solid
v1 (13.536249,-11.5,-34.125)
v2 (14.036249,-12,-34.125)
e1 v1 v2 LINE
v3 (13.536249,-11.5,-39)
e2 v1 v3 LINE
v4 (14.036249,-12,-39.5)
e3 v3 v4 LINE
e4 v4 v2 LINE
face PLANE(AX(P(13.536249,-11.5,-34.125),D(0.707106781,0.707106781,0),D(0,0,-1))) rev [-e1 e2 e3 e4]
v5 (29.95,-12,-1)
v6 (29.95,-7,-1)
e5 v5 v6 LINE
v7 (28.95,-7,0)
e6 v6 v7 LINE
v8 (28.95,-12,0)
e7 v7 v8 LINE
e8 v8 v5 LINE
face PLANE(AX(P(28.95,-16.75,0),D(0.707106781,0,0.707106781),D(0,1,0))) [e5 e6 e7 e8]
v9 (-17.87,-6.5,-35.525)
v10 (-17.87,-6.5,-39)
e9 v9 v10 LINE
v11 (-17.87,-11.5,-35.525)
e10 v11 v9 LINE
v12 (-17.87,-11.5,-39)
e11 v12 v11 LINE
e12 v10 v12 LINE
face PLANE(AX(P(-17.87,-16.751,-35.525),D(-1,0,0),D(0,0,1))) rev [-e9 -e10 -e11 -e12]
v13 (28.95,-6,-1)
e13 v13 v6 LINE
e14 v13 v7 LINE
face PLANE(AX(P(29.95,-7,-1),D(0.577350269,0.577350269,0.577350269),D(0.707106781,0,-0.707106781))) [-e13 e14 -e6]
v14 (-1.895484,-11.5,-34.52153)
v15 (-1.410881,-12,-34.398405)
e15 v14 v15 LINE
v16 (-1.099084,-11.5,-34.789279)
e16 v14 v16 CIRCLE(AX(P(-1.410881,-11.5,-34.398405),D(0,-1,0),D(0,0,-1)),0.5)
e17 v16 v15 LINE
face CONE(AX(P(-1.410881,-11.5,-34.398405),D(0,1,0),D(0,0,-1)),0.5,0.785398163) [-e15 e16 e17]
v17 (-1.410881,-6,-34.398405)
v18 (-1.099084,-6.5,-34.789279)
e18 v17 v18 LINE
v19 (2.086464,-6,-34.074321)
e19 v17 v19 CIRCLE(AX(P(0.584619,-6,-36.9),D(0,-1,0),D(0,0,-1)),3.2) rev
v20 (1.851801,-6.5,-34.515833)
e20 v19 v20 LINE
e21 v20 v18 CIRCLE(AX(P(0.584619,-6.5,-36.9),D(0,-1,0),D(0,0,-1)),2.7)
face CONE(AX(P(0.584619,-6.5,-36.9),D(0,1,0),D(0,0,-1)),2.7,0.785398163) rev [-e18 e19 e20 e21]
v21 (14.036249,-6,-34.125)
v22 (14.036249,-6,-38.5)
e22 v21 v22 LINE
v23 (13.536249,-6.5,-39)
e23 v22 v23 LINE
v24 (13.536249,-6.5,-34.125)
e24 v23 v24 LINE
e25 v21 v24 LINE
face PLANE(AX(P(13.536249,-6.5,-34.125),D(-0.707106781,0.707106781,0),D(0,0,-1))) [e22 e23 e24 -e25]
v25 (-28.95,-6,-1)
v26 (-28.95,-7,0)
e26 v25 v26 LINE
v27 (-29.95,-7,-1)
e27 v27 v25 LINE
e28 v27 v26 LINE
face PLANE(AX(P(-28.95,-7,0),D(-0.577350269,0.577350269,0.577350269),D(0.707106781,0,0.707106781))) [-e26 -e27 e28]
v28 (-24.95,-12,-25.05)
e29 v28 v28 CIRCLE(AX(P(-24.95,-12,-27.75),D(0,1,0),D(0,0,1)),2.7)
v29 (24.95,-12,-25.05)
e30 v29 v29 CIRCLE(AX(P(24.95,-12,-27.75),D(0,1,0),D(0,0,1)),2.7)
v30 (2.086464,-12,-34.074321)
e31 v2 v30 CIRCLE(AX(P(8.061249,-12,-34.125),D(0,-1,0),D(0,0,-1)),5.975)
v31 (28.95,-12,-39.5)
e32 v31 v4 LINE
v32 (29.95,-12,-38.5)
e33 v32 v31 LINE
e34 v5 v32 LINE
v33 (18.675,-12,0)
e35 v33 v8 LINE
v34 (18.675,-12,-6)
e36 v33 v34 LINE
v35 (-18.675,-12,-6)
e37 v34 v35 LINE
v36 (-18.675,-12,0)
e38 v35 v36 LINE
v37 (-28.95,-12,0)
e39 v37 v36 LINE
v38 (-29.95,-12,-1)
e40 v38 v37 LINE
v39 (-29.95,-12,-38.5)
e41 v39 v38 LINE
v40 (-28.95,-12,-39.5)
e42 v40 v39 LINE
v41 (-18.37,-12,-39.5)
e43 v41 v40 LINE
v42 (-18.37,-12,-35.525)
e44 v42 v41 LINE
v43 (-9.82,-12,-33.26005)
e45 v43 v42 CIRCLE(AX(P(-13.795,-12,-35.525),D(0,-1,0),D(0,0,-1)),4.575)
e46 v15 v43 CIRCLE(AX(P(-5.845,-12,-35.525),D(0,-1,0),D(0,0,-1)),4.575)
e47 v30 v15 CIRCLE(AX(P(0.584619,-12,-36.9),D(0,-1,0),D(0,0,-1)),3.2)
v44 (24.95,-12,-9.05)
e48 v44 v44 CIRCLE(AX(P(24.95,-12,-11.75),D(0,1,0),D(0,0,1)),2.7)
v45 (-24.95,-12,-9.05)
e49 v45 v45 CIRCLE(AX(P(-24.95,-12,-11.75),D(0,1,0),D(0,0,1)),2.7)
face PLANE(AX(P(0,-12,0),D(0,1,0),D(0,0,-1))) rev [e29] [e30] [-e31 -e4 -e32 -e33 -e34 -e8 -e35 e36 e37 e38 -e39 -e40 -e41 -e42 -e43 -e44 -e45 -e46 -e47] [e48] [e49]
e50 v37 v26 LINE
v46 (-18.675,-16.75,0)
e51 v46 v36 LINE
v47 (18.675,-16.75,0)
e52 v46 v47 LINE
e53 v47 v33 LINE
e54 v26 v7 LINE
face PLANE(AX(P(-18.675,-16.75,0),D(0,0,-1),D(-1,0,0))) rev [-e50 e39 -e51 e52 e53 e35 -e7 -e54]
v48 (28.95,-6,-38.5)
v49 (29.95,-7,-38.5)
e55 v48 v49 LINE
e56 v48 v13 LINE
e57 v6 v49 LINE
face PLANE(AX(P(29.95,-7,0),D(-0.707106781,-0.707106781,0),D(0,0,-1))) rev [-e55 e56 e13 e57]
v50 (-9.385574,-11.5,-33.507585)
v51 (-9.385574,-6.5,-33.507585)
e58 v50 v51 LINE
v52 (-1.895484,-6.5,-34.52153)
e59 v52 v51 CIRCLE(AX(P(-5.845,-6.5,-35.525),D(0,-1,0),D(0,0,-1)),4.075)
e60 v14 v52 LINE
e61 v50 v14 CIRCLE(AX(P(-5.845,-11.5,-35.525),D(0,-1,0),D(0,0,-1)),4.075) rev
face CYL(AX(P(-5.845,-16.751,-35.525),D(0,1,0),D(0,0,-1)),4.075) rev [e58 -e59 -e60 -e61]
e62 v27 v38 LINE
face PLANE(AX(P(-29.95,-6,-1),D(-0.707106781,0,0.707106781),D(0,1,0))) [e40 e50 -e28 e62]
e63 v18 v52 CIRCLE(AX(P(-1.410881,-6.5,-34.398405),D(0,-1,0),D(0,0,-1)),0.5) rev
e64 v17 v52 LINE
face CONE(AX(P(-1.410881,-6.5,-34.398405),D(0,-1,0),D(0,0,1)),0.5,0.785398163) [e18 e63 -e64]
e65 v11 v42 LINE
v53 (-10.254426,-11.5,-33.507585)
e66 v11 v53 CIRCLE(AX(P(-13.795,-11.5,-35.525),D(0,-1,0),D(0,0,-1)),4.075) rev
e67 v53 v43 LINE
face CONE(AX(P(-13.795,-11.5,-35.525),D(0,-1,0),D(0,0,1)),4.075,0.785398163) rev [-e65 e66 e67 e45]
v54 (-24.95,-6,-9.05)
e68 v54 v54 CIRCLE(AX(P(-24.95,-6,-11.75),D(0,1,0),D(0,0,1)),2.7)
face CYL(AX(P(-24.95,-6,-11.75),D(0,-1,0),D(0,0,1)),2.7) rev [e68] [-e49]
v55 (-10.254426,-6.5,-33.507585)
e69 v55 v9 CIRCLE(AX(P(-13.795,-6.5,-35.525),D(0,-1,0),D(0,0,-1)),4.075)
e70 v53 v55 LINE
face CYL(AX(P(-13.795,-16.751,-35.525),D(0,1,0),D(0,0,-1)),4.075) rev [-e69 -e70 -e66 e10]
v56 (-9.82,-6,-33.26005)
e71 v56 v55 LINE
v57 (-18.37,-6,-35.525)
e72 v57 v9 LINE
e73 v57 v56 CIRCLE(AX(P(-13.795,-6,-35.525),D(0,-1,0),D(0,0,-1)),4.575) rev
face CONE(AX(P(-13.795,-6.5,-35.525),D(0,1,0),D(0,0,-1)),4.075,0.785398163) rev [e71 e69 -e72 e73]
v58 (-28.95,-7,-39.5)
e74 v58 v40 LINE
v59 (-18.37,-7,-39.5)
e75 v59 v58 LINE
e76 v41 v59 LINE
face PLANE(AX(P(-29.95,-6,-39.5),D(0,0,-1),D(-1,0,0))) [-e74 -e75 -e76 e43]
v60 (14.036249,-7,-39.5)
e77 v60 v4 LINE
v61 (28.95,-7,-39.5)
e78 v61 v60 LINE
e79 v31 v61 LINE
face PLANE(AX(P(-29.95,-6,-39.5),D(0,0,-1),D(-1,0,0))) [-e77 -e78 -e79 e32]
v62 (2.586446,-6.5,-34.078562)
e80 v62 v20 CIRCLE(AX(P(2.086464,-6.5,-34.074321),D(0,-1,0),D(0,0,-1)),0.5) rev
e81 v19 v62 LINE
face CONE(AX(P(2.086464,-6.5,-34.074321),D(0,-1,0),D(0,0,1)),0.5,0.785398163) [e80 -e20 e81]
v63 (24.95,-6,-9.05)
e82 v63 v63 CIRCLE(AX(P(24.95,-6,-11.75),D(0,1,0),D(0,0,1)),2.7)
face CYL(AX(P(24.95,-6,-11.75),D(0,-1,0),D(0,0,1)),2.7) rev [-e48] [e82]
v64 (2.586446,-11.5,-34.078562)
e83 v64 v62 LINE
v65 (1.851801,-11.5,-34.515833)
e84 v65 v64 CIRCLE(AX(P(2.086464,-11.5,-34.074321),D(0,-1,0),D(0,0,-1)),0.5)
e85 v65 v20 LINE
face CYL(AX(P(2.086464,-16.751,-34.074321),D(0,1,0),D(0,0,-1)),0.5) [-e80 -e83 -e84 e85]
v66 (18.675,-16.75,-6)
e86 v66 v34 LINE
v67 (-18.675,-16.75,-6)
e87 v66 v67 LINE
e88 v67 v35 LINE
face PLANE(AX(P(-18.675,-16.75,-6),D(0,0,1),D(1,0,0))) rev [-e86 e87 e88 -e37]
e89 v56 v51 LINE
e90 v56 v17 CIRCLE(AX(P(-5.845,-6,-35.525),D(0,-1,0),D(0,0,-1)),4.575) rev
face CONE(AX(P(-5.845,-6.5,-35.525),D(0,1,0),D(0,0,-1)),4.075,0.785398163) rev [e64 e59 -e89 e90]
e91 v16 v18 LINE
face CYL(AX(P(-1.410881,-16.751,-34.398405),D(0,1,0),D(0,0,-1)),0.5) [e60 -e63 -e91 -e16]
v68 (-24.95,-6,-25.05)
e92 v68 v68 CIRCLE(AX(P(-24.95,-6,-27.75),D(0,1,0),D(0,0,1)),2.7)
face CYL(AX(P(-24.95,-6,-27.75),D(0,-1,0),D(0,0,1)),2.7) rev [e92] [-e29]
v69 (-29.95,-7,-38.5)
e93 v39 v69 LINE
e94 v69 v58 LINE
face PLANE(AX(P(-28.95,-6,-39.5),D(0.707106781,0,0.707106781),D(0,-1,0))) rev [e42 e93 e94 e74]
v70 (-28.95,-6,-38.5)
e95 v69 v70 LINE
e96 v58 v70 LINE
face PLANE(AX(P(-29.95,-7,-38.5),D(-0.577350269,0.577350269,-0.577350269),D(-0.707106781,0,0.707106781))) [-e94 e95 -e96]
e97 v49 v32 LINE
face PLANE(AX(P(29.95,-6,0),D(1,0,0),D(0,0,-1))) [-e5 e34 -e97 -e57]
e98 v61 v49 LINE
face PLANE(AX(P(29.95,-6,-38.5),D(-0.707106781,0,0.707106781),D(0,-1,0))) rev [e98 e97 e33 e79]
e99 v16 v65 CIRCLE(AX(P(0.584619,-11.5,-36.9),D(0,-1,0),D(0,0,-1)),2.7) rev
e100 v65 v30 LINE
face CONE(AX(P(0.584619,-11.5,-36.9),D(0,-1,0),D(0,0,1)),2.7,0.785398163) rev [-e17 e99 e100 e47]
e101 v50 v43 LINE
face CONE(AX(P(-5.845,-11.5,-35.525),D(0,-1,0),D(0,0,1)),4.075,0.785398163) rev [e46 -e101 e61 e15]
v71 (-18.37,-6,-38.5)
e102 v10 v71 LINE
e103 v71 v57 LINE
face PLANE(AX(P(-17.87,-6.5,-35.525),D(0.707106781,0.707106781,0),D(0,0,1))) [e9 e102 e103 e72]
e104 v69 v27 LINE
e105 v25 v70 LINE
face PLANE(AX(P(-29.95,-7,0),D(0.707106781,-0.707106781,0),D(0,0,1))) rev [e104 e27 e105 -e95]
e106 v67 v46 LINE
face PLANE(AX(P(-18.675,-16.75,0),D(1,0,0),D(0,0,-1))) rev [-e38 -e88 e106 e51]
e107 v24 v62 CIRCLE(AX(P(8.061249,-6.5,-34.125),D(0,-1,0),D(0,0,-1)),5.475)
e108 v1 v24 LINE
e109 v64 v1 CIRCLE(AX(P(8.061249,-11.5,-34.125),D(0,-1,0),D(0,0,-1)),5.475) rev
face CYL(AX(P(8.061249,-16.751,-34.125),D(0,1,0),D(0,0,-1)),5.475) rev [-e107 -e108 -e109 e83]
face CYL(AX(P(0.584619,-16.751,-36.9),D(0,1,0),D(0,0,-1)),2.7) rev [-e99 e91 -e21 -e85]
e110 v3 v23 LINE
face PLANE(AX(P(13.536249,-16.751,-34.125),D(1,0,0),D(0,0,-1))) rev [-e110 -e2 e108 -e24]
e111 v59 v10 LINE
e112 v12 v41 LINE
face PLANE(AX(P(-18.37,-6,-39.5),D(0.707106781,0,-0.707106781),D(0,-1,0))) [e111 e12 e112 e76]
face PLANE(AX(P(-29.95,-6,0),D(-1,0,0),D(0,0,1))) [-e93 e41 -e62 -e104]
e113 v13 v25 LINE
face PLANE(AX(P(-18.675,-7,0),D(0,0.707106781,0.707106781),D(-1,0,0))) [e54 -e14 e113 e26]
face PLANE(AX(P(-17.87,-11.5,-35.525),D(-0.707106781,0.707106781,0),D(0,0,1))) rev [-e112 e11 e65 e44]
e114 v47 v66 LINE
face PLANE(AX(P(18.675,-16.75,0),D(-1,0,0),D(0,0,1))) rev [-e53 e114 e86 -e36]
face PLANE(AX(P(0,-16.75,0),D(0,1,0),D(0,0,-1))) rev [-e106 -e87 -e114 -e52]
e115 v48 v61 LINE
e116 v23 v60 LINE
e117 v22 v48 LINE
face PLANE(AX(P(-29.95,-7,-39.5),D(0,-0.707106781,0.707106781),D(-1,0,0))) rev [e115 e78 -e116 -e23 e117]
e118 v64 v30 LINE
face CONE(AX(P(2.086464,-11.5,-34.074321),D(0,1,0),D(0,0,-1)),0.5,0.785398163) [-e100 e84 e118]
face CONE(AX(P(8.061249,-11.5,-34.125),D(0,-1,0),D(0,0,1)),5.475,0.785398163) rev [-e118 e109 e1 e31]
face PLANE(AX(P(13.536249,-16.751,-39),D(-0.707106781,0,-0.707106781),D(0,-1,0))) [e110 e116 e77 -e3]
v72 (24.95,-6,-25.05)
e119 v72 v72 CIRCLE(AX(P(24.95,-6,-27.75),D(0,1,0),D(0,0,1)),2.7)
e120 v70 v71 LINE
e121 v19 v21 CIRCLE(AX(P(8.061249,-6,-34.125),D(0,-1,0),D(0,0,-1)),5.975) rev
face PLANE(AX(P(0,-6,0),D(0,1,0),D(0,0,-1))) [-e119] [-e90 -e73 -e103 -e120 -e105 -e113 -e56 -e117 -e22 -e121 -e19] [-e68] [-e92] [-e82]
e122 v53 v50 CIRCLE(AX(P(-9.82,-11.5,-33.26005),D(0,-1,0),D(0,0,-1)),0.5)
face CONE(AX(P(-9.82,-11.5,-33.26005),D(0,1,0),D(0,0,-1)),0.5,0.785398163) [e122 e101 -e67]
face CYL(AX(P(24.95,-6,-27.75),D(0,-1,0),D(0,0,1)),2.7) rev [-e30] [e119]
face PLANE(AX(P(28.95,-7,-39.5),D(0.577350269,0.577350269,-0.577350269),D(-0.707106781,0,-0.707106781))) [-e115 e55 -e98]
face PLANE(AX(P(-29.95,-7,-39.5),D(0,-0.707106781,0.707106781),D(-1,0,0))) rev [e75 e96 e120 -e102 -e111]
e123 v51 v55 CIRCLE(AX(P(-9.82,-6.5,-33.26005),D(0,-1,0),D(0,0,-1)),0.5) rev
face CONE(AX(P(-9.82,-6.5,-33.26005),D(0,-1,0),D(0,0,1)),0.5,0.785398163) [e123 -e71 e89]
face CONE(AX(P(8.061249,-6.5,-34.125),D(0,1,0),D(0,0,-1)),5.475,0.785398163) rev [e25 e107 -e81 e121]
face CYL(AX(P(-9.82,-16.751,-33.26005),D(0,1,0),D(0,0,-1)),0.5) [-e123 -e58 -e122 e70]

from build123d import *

# Parameters (mm, degrees)
SKETCH3_W           = 37.35
SKETCH3_H           = 6
BOSS_EXTRUDE1_DEPTH = 4.75
SKETCH4_W           = 59.9
SKETCH4_H           = 39.5
SKETCH4_R           = 2.7
BOSS_EXTRUDE2_DEPTH = 6
CUT_EXTRUDE1_REACH  = 52.723
CHAMFER1_SIZE       = 1
CHAMFER2_SIZE       = 0.5


with BuildPart() as part:
    # Sketch3 → Boss-Extrude1 (new body)
    with BuildSketch(Plane(origin=(0, 0, 0), x_dir=(1, 0, 0), z_dir=(0, 1, 0))):
        with Locations((0, 3)):
            Rectangle(SKETCH3_W, SKETCH3_H)
    extrude(amount=BOSS_EXTRUDE1_DEPTH)

    # Sketch4 → Boss-Extrude2 (add)
    with BuildSketch(Plane(origin=(0, 0, 0), x_dir=(1, 0, 0), z_dir=(0, 1, 0))):
        with Locations((0, 19.75)):
            Rectangle(SKETCH4_W, SKETCH4_H)
        with Locations(Location((-24.95, 11.75, 0), (0, 0, 270))):
            Circle(SKETCH4_R, mode=Mode.SUBTRACT)
        with Locations(Location((-24.95, 27.75, 0), (0, 0, 270))):
            Circle(SKETCH4_R, mode=Mode.SUBTRACT)
        with Locations(Location((24.95, 11.75, 0), (0, 0, 270))):
            Circle(SKETCH4_R, mode=Mode.SUBTRACT)
        with Locations(Location((24.95, 27.75, 0), (0, 0, 270))):
            Circle(SKETCH4_R, mode=Mode.SUBTRACT)
    extrude(amount=-BOSS_EXTRUDE2_DEPTH)

    # Sketch5 → Cut-Extrude1 (cut, up to next)
    with BuildSketch(Plane.XZ.offset(6), mode=Mode.PRIVATE) as cut_extrude1_sk1:
        with BuildLine():
            Line((-17.87, -35.525), (-17.87, -39.5))
            Line((-17.87, -39.5), (13.536249219, -39.5))
            Line((13.536249219, -39.5), (13.536249219, -34.125))
            ThreePointArc((13.536249219, -34.125), (8.084468405, -28.650049236), (2.586446162, -34.078562046))
            ThreePointArc((2.586446162, -34.078562046), (2.342198533, -34.503972069), (1.851800837, -34.515833459))
            ThreePointArc((1.851800837, -34.515833459), (0.335489147, -34.21151821), (-1.099084421, -34.789279052))
            ThreePointArc((-1.099084421, -34.789279052), (-1.570217122, -34.872337403), (-1.895484475, -34.521529961))
            ThreePointArc((-1.895484475, -34.521529961), (-5.298347165, -31.486832634), (-9.38557377, -33.507585225))
            ThreePointArc((-9.38557377, -33.507585225), (-9.82, -33.760049669), (-10.25442623, -33.507585225))
            ThreePointArc((-10.25442623, -33.507585225), (-14.838500571, -31.585871726), (-17.87, -35.525))
        make_face()
    cut_extrude1_tool1 = extrude(cut_extrude1_sk1.sketch, amount=-CUT_EXTRUDE1_REACH, mode=Mode.PRIVATE) & part.part
    add(cut_extrude1_tool1.solids().sort_by_distance((-1.140343, -6, -35.39747))[0], mode=Mode.SUBTRACT)

    # Chamfer1
    chamfer1_edges = [part.edges().sort_by_distance(p)[0] for p in [
        (-29.95, -6, -19.75),
        (-29.95, -3, 0),
        (21.74312461, -6, -39.5),
        (-29.95, -3, -39.5),
        (29.95, -6, -19.75),
        (29.95, -3, -39.5),
        (0, -6, 0),
        (29.95, -3, 0),
        (-23.91, -6, -39.5),
    ]]
    chamfer(chamfer1_edges, length=CHAMFER1_SIZE)

    # Chamfer2
    chamfer2_edges = [part.edges().sort_by_distance(p)[0] for p in [
        (13.536249219, 0, -36.8125),
        (8.084468405, 0, -28.650049236),
        (2.342198533, 0, -34.503972069),
        (0.335489147, 0, -34.21151821),
        (-1.570217122, 0, -34.872337403),
        (-5.298347165, 0, -31.486832634),
        (-9.82, 0, -33.760049669),
        (-14.838500571, 0, -31.585871726),
        (-17.87, 0, -37.5125),
        (13.536249219, -6, -36.3125),
        (8.084468405, -6, -28.650049236),
        (2.342198533, -6, -34.503972069),
        (0.335489147, -6, -34.21151821),
        (-1.570217122, -6, -34.872337403),
        (-5.298347165, -6, -31.486832634),
        (-9.82, -6, -33.760049669),
        (-14.838500571, -6, -31.585871726),
        (-17.87, -6, -37.0125),
        (13.536249219, -2.5, -39.5),
        (-17.87, -2.5, -39.5),
    ]]
    chamfer(chamfer2_edges, length=CHAMFER2_SIZE - 0.0001)  # a hair under: the kernel refuses the full size


with BuildPart() as body_2:
    # Mirror1: mirrored copy
    add(part.part.mirror(Plane(origin=(0, -6, 0), x_dir=(0, 0, 1), z_dir=(0, -1, 0))))


solid = body_2.part
